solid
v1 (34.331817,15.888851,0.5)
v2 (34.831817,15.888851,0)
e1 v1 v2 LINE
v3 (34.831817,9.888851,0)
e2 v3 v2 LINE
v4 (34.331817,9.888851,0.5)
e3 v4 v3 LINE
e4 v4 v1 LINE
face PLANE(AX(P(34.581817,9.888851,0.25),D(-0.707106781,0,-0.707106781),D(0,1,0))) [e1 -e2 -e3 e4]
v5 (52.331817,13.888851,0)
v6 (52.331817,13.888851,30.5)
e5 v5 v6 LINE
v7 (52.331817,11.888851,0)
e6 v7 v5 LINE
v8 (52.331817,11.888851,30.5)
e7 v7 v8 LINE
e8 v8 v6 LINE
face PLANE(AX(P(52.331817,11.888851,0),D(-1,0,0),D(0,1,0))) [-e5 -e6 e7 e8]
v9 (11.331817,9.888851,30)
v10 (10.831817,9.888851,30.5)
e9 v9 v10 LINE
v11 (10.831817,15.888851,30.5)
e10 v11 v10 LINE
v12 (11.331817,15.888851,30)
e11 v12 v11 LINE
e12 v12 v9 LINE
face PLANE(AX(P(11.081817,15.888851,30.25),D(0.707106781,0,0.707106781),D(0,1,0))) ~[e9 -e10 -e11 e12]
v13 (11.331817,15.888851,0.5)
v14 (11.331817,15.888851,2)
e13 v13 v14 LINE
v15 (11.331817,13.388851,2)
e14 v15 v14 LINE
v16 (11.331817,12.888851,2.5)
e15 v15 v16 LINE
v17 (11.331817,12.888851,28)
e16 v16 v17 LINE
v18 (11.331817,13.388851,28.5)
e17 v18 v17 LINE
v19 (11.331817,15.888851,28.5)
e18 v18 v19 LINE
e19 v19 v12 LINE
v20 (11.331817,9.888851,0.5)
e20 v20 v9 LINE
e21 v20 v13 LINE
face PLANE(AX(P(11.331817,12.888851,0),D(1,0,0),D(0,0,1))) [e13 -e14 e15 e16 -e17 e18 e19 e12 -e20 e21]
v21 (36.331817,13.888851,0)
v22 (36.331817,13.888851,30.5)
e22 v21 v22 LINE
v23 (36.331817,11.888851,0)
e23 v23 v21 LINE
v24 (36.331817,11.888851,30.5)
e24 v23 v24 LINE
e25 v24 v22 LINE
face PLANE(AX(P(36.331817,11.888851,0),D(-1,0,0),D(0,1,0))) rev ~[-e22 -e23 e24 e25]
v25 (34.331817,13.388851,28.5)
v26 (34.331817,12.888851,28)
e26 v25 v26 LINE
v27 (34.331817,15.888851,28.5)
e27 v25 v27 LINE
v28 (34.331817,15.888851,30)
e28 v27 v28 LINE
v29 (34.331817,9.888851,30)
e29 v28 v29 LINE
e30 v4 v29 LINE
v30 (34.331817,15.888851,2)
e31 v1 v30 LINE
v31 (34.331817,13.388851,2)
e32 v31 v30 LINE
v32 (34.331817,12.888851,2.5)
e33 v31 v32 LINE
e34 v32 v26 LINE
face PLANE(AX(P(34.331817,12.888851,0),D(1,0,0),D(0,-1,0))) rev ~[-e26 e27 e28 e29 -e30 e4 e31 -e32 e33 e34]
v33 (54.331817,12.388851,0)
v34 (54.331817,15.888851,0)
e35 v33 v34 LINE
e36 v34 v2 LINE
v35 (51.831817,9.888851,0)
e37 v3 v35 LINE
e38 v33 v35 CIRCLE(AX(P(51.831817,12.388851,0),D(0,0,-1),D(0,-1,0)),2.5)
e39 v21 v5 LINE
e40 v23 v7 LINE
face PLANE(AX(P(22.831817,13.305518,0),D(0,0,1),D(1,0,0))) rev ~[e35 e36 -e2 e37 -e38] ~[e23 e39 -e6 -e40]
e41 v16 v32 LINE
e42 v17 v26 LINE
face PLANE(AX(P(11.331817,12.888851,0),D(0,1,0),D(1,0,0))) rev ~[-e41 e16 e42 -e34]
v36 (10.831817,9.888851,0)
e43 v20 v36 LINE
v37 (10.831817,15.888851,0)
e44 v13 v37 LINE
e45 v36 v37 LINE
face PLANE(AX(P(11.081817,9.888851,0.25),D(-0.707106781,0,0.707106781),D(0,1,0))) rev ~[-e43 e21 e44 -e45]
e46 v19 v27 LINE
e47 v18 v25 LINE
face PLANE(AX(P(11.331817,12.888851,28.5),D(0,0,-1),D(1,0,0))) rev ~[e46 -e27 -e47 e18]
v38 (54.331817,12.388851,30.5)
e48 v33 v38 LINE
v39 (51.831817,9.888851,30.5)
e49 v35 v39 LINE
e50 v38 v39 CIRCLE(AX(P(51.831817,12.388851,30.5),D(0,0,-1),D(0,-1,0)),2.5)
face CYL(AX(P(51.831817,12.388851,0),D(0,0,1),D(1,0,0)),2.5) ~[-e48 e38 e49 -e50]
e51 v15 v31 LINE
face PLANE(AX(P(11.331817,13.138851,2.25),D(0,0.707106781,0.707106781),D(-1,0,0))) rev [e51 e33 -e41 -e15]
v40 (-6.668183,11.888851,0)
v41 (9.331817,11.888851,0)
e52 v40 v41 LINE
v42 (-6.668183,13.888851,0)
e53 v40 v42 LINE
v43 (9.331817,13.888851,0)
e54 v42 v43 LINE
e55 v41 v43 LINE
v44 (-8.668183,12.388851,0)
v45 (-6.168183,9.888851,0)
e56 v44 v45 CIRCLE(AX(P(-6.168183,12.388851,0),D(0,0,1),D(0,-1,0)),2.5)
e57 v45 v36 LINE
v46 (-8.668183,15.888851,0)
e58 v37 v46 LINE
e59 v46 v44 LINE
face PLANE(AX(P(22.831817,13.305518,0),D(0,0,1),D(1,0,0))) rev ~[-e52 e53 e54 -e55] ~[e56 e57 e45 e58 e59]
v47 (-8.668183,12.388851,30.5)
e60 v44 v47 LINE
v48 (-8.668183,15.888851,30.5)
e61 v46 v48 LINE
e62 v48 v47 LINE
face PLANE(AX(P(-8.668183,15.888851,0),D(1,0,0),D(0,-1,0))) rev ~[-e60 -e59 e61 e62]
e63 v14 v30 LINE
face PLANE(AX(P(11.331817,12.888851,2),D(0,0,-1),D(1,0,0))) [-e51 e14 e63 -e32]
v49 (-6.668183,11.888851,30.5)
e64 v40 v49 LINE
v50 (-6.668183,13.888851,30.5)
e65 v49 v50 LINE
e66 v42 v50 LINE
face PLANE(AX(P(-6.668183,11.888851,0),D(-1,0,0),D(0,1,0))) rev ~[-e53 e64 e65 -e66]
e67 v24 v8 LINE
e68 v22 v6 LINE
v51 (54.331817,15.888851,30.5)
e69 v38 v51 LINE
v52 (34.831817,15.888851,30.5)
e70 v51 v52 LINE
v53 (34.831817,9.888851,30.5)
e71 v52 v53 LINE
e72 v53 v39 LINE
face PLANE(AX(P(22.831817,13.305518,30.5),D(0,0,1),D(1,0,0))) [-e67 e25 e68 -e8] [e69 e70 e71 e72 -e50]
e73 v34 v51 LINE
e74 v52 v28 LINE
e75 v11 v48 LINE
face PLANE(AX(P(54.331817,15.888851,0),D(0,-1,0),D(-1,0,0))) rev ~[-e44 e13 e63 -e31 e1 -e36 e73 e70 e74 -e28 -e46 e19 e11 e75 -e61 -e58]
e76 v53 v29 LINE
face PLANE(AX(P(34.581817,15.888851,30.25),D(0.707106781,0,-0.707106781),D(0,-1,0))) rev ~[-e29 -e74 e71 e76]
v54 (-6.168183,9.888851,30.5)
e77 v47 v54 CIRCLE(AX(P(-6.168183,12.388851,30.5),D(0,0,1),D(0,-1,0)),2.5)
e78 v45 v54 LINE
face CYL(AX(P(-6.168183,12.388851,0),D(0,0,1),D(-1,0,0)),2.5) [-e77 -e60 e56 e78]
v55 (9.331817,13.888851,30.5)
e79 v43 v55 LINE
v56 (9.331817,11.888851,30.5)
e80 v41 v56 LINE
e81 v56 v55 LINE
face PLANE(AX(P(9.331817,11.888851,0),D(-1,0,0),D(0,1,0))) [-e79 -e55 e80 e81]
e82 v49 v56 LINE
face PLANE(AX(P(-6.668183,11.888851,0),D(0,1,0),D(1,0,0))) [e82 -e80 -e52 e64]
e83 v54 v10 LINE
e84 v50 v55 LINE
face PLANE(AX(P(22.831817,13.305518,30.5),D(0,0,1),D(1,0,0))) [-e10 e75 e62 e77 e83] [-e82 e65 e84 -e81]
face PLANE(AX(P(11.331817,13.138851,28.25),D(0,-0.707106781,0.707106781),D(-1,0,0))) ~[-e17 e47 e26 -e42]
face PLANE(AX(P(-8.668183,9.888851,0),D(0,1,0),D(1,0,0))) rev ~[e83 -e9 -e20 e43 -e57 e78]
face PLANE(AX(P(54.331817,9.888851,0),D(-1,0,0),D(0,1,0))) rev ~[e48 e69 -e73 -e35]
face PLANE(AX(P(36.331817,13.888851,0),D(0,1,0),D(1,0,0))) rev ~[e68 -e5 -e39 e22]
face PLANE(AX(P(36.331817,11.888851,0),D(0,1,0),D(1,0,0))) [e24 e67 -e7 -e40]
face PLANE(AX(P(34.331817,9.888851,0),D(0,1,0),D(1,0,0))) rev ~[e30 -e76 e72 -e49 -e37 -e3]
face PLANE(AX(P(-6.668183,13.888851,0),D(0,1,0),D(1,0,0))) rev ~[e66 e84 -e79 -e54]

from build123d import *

# Parameters (mm, degrees)
F0_W     = 16
F0_H     = 2
F1_DEPTH = 30.5
F2_R     = 2.5
F3_W     = 23
F3_H     = 2
F4_DEPTH = 25
F5_SIZE  = 0.5


with BuildPart() as f1:
    # F0 (on Top) → F1 (new body)
    with BuildSketch(Plane.XY):
        Polygon((54.3318165131, 15.8888510838), (-8.6681834869, 15.8888510838), (-8.6681834869, 9.8888510838), (11.3318165131, 9.8888510838), (11.3318165131, 12.8888510838), (34.3318165131, 12.8888510838), (34.3318165131, 9.8888510838), (54.3318165131, 9.8888510838), align=None)
        with Locations((1.3318165131, 12.8888510838)):
            Rectangle(F0_W, F0_H, mode=Mode.SUBTRACT)
        with Locations((44.3318165131, 12.8888510838)):
            Rectangle(F0_W, F0_H, mode=Mode.SUBTRACT)
    extrude(amount=F1_DEPTH)

    # F2
    f2_edges = [f1.edges().sort_by_distance(p)[0] for p in [
        (-8.668183, 9.888851, 15.25),
        (54.331817, 9.888851, 15.25),
    ]]
    fillet(f2_edges, radius=F2_R)

    # F3 (on face) → F4 (cut)
    with BuildSketch(Plane.XZ.offset(-12.8888510838)):
        with Locations((22.8318165131, 1)):
            Rectangle(F3_W, F3_H)
        with Locations((22.8318165131, 29.5)):
            Rectangle(F3_W, F3_H)
    extrude(amount=-F4_DEPTH, mode=Mode.SUBTRACT)

    # F5
    f5_edges = [f1.edges().sort_by_distance(p)[0] for p in [
        (11.331817, 12.888851, 30.5),
        (34.331817, 12.888851, 30.5),
        (34.331817, 12.888851, 0),
        (11.331817, 12.888851, 0),
        (22.831817, 12.888851, 2),
        (22.831817, 12.888851, 28.5),
    ]]
    chamfer(f5_edges, length=F5_SIZE)


solid = f1.part
